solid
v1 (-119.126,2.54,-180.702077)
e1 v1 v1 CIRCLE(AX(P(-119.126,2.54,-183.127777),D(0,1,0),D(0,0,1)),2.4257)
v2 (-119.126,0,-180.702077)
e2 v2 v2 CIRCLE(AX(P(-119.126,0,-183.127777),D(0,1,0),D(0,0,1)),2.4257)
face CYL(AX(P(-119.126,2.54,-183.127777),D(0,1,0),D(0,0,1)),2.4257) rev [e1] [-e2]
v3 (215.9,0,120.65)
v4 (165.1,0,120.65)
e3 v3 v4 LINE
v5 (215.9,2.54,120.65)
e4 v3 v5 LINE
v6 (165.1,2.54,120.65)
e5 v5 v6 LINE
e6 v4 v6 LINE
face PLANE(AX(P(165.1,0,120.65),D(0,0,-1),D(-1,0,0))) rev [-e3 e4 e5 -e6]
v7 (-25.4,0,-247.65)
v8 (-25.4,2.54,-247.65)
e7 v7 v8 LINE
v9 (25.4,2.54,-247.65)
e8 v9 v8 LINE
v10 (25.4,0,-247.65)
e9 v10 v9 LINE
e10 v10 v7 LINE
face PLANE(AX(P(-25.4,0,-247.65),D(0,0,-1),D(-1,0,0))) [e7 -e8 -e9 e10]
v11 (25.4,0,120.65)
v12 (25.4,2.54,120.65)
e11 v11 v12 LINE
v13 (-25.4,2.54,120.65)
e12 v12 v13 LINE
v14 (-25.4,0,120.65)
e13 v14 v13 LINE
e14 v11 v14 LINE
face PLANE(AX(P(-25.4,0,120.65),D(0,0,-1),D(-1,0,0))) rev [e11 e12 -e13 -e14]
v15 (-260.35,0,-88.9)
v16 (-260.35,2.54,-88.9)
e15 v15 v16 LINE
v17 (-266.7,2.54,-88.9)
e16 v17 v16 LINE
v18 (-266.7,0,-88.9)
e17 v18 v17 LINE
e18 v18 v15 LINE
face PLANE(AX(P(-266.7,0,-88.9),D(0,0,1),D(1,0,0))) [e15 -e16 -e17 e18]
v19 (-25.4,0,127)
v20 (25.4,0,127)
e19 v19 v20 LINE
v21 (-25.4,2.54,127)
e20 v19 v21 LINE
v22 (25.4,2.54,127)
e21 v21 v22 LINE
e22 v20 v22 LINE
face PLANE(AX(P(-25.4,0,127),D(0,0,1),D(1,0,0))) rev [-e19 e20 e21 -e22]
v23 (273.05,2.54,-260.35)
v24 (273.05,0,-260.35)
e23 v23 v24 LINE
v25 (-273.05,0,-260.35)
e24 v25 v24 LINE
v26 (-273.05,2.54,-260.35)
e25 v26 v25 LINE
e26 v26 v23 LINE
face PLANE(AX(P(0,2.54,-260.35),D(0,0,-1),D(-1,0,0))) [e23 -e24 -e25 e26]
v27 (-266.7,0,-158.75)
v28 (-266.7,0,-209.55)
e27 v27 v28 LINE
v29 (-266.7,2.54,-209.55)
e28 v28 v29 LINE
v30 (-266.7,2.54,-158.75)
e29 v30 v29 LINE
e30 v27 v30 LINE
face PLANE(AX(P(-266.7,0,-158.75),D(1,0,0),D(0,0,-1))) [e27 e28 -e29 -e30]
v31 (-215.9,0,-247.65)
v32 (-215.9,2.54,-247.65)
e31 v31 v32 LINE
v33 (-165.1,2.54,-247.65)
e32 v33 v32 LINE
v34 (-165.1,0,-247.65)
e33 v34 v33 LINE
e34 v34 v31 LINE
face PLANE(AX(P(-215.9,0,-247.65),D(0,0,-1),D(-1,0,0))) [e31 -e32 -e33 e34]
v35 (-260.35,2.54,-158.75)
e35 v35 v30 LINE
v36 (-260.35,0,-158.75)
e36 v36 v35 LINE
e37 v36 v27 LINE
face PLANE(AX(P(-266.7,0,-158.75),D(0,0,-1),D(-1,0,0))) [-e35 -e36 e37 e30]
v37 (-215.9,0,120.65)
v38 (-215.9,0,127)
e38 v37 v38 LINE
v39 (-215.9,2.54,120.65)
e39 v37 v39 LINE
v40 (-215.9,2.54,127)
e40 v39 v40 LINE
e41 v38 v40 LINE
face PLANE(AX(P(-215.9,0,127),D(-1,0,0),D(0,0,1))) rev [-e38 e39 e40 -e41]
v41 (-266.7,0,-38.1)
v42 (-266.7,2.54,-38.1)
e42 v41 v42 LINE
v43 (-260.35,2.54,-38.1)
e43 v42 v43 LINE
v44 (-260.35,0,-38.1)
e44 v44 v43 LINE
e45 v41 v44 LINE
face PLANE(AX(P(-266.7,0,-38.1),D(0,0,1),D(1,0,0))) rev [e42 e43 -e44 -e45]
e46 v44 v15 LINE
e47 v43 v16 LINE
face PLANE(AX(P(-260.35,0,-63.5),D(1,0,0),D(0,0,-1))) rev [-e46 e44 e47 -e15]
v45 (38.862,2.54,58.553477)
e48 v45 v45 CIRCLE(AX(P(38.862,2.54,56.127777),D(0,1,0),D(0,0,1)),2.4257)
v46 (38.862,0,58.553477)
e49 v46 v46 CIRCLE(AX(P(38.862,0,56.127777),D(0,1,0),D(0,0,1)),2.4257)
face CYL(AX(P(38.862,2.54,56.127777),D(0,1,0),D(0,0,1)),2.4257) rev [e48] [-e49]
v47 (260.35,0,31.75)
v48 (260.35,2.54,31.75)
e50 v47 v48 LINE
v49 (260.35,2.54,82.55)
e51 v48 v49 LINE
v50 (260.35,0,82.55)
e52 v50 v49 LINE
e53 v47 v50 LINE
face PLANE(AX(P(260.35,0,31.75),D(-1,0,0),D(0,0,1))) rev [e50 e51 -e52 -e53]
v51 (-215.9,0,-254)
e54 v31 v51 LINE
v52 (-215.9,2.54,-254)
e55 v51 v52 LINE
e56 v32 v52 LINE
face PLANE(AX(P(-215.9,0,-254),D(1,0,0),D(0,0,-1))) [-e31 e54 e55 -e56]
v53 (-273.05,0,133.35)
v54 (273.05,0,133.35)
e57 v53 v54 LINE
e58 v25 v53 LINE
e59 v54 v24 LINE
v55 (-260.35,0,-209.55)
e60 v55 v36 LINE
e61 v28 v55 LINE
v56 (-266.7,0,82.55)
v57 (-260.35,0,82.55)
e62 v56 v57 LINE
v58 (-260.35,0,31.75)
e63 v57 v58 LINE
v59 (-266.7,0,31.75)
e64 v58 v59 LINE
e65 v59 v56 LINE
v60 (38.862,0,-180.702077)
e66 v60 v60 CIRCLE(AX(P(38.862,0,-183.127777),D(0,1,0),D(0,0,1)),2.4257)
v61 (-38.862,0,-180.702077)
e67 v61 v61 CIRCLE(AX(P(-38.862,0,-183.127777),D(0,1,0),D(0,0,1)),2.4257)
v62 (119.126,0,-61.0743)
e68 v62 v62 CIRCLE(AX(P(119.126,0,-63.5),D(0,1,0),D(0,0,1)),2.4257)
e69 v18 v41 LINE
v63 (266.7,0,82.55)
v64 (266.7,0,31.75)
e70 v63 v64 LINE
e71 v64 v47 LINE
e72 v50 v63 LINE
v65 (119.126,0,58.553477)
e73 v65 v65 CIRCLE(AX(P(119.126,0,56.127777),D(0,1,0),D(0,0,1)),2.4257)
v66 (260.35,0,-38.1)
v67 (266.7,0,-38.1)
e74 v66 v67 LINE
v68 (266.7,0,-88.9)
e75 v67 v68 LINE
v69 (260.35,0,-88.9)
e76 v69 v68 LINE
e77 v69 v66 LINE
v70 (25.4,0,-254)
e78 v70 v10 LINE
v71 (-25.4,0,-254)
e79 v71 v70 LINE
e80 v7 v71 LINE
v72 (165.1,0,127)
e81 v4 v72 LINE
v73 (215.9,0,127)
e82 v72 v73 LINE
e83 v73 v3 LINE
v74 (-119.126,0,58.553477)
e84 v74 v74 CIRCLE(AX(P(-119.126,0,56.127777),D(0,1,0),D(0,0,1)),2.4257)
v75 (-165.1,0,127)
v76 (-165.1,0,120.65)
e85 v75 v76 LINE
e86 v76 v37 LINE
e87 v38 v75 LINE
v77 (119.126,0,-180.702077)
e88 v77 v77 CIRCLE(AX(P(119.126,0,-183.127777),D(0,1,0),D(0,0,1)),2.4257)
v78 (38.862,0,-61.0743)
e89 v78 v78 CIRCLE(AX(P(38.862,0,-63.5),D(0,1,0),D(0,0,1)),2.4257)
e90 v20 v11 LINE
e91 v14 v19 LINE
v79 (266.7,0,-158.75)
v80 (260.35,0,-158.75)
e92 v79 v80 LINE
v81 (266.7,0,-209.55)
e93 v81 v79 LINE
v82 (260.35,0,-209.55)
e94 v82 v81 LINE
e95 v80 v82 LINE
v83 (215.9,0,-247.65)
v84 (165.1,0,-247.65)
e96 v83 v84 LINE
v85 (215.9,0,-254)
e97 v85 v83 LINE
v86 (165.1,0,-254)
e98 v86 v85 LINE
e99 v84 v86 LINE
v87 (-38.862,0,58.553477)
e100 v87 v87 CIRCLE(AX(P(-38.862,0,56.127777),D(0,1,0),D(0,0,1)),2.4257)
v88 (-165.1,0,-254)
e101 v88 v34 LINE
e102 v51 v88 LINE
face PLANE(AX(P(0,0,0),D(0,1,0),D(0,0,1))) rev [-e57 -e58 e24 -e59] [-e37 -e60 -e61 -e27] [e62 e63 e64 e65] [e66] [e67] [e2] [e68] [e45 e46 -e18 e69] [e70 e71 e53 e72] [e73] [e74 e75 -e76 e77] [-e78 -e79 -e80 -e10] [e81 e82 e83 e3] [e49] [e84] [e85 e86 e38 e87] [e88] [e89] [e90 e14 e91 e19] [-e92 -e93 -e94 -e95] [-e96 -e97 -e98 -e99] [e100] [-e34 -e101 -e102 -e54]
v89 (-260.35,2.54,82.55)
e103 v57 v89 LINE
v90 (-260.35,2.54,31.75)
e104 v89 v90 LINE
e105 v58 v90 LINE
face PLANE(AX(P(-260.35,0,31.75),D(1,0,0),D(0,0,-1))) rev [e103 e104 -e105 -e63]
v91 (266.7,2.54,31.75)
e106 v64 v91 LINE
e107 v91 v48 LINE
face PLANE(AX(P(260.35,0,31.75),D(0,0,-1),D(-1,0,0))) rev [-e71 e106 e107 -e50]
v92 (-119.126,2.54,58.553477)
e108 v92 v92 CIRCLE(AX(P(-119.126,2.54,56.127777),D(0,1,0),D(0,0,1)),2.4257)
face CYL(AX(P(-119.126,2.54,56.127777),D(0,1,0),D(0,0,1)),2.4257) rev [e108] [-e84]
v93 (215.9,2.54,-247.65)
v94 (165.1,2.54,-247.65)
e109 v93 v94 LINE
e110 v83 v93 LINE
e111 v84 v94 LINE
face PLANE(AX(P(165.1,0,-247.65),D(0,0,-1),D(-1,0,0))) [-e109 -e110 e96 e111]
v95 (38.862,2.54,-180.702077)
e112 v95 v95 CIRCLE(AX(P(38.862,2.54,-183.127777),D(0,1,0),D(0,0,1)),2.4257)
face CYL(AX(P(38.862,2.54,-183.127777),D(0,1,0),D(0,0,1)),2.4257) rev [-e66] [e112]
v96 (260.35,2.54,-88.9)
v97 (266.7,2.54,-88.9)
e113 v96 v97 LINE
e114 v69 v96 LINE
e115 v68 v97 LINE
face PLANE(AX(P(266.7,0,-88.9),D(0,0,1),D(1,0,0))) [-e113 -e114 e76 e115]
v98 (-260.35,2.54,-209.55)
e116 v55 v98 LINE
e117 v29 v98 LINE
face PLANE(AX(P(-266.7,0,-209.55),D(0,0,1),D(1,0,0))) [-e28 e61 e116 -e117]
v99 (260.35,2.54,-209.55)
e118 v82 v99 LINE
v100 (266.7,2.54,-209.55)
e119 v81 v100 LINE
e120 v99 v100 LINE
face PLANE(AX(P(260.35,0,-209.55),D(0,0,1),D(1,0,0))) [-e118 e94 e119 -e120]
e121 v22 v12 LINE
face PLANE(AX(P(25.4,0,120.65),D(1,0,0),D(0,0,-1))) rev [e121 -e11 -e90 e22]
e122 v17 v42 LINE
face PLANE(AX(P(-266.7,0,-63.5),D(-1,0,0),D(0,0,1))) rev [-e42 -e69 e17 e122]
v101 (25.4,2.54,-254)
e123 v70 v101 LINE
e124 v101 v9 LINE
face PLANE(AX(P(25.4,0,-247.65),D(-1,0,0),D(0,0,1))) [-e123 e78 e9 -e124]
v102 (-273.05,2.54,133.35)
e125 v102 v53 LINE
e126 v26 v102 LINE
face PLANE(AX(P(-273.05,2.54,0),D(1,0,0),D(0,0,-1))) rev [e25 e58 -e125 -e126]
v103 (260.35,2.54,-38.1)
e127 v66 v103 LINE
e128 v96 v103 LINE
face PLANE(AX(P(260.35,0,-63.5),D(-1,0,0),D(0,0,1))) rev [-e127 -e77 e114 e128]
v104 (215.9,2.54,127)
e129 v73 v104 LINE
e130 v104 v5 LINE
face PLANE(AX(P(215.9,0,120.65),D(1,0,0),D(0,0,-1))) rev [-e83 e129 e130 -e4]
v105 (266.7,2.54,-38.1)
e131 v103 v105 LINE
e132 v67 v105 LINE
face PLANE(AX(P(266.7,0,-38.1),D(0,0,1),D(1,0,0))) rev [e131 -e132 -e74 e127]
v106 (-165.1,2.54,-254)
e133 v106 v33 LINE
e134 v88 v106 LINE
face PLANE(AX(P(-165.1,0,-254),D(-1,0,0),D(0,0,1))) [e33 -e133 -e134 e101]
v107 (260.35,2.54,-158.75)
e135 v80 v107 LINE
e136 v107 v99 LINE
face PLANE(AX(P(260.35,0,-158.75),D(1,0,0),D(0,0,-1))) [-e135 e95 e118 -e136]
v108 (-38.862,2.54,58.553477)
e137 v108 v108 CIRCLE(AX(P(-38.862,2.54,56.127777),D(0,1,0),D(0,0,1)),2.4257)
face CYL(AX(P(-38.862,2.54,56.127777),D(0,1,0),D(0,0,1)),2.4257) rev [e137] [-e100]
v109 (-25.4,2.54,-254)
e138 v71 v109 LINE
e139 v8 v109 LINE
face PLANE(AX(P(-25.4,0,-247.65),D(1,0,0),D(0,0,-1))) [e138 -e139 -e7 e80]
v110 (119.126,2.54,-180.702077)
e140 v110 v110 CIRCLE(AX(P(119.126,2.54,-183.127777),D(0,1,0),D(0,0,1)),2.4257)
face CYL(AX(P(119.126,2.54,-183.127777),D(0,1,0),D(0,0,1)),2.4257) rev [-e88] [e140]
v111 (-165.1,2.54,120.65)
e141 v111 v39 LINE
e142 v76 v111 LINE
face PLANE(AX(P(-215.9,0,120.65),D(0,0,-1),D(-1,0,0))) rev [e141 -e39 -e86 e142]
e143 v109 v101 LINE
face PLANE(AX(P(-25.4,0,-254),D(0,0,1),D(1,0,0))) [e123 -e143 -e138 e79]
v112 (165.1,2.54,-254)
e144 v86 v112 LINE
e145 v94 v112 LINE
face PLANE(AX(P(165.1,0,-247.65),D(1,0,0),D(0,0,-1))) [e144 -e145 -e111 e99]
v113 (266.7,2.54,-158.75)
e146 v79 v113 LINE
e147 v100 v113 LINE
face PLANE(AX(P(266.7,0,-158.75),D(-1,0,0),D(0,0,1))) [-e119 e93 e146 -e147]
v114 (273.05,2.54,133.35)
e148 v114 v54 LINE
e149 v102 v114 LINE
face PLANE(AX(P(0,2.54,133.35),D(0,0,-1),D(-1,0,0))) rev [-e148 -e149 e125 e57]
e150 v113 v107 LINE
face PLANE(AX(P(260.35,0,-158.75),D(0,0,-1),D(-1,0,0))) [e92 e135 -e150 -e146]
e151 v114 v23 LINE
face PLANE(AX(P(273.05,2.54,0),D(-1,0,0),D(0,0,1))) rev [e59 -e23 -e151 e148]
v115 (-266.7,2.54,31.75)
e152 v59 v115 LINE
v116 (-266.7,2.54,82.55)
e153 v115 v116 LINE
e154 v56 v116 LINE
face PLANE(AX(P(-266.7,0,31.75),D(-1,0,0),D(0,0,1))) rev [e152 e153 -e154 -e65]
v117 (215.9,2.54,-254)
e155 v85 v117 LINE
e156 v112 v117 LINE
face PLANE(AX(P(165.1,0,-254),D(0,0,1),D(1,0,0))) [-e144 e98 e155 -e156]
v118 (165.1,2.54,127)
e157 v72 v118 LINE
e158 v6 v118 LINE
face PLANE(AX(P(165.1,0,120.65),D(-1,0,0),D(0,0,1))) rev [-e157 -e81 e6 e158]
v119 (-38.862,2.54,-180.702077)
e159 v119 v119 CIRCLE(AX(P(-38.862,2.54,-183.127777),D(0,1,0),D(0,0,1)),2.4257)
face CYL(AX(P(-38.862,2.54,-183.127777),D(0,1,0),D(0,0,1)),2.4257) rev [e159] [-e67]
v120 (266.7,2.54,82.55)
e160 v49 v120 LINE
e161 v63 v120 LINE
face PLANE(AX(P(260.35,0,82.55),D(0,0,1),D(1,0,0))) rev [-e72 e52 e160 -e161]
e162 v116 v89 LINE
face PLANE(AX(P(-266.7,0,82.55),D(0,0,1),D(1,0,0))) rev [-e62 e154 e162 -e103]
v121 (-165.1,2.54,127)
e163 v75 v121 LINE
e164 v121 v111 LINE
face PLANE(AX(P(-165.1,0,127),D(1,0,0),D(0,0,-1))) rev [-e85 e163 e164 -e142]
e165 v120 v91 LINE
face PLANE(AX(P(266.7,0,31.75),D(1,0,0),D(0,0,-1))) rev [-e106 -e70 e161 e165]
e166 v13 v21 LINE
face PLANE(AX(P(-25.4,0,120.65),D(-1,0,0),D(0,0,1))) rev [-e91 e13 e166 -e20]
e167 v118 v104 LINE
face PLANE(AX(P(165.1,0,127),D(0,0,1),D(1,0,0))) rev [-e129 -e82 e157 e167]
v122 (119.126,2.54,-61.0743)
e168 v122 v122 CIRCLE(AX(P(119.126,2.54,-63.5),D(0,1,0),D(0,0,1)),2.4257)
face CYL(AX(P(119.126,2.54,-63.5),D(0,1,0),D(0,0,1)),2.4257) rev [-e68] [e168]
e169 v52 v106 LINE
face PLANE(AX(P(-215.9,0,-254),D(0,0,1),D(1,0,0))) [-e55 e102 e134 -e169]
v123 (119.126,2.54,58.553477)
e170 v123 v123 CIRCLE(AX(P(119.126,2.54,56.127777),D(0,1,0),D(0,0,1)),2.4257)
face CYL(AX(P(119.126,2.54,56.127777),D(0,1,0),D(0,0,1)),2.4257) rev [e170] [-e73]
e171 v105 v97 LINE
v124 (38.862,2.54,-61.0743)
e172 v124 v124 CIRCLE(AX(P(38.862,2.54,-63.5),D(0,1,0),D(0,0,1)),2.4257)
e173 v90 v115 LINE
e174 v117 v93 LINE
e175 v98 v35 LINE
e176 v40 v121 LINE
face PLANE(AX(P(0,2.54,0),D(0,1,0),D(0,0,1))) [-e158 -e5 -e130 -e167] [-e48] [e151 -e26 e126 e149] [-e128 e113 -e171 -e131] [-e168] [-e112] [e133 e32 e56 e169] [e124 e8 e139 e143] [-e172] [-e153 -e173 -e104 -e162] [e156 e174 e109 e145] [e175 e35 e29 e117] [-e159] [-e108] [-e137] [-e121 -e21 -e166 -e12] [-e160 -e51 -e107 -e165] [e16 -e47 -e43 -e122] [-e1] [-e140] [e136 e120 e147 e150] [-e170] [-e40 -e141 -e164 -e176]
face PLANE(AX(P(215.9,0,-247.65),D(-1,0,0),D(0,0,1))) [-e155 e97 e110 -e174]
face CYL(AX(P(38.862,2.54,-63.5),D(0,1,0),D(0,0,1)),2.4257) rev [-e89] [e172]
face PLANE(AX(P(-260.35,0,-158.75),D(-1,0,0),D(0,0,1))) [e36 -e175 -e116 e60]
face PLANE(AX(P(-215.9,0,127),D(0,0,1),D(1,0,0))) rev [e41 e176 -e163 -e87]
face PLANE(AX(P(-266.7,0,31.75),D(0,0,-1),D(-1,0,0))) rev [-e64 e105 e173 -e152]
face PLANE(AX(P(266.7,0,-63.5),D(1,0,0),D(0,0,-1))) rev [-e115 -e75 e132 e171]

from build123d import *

# Parameters (mm, degrees)
BOSS_EXTRUDE1_DEPTH         = 2.54
F_11_0_191_DIAMETER_HOLE2_D = 4.8514
F_11_0_191_DIAMETER_HOLE3_D = 4.8514
SKETCH17_W                  = 6.35
SKETCH17_H                  = 50.8
SKETCH17_W_2                = 50.8
SKETCH17_H_2                = 6.35
SKETCH17_H_3                = 25.4
CUT_EXTRUDE12_DEPTH         = 304.883162745


with BuildPart() as part:
    # Sketch1 → Boss-Extrude1 (new body)
    with BuildSketch(Plane(origin=(0, 0, 0), x_dir=(1, 0, 0), z_dir=(0, 1, 0))):
        Polygon((0, 63.5), (-273.05, 63.5), (-273.05, -63.5), (-273.05, -133.35), (273.05, -133.35), (273.05, -63.5), (273.05, 63.5), align=None)
    boss_extrude1 = extrude(amount=BOSS_EXTRUDE1_DEPTH)

    # #11 (0.191) Diameter Hole2 (through all)
    with Locations(Plane(origin=(0, 2.54, 0), x_dir=(1, 0, 0), z_dir=(0, 1, 0))):
        with Locations((-119.126, -56.127777467), (-38.862, -56.127777467), (38.862, -56.127777467), (119.126, -56.127777467)):
            f_11_0_191_diameter_hole2 = Hole(F_11_0_191_DIAMETER_HOLE2_D / 2)

    # #11 (0.191) Diameter Hole3 (through all)
    with Locations(Plane(origin=(0, 2.54, 0), x_dir=(1, 0, 0), z_dir=(0, 1, 0))):
        with Locations((119.126, 63.5), (38.862, 63.5)):
            f_11_0_191_diameter_hole3 = Hole(F_11_0_191_DIAMETER_HOLE3_D / 2)

    # Sketch17 → Cut-Extrude12 (cut, through all)
    with BuildSketch(Plane(origin=(0, 2.54, 0), x_dir=(1, 0, 0), z_dir=(0, 1, 0))):
        with Locations((-263.525, -57.15)):
            Rectangle(SKETCH17_W, SKETCH17_H)
        with Locations((-190.5, -123.825)):
            Rectangle(SKETCH17_W_2, SKETCH17_H_2)
        with Locations((190.5, -123.825)):
            Rectangle(SKETCH17_W_2, SKETCH17_H_2)
        with Locations((263.525, -57.15)):
            Rectangle(SKETCH17_W, SKETCH17_H)
        with Locations((0, -123.825)):
            Rectangle(SKETCH17_W_2, SKETCH17_H_2)
        with Locations((-263.525, 50.8)):
            Rectangle(SKETCH17_W, SKETCH17_H_3)
        with Locations((263.525, 50.8)):
            Rectangle(SKETCH17_W, SKETCH17_H_3)
    cut_extrude12 = extrude(amount=-CUT_EXTRUDE12_DEPTH, mode=Mode.SUBTRACT)

    # Mirror1: Boss-Extrude1, #11 (0.191) Diameter Hole2, #11 (0.191) Diameter Hole3, Cut-Extrude12 across plane
    add(boss_extrude1.mirror(Plane(origin=(0, 2.54, -63.5), x_dir=(1, 0, 0), z_dir=(0, 0, -1))))
    add(f_11_0_191_diameter_hole2.mirror(Plane(origin=(0, 2.54, -63.5), x_dir=(1, 0, 0), z_dir=(0, 0, -1))), mode=Mode.SUBTRACT)
    add(f_11_0_191_diameter_hole3.mirror(Plane(origin=(0, 2.54, -63.5), x_dir=(1, 0, 0), z_dir=(0, 0, -1))), mode=Mode.SUBTRACT)
    add(cut_extrude12.mirror(Plane(origin=(0, 2.54, -63.5), x_dir=(1, 0, 0), z_dir=(0, 0, -1))), mode=Mode.SUBTRACT)


solid = part.part
